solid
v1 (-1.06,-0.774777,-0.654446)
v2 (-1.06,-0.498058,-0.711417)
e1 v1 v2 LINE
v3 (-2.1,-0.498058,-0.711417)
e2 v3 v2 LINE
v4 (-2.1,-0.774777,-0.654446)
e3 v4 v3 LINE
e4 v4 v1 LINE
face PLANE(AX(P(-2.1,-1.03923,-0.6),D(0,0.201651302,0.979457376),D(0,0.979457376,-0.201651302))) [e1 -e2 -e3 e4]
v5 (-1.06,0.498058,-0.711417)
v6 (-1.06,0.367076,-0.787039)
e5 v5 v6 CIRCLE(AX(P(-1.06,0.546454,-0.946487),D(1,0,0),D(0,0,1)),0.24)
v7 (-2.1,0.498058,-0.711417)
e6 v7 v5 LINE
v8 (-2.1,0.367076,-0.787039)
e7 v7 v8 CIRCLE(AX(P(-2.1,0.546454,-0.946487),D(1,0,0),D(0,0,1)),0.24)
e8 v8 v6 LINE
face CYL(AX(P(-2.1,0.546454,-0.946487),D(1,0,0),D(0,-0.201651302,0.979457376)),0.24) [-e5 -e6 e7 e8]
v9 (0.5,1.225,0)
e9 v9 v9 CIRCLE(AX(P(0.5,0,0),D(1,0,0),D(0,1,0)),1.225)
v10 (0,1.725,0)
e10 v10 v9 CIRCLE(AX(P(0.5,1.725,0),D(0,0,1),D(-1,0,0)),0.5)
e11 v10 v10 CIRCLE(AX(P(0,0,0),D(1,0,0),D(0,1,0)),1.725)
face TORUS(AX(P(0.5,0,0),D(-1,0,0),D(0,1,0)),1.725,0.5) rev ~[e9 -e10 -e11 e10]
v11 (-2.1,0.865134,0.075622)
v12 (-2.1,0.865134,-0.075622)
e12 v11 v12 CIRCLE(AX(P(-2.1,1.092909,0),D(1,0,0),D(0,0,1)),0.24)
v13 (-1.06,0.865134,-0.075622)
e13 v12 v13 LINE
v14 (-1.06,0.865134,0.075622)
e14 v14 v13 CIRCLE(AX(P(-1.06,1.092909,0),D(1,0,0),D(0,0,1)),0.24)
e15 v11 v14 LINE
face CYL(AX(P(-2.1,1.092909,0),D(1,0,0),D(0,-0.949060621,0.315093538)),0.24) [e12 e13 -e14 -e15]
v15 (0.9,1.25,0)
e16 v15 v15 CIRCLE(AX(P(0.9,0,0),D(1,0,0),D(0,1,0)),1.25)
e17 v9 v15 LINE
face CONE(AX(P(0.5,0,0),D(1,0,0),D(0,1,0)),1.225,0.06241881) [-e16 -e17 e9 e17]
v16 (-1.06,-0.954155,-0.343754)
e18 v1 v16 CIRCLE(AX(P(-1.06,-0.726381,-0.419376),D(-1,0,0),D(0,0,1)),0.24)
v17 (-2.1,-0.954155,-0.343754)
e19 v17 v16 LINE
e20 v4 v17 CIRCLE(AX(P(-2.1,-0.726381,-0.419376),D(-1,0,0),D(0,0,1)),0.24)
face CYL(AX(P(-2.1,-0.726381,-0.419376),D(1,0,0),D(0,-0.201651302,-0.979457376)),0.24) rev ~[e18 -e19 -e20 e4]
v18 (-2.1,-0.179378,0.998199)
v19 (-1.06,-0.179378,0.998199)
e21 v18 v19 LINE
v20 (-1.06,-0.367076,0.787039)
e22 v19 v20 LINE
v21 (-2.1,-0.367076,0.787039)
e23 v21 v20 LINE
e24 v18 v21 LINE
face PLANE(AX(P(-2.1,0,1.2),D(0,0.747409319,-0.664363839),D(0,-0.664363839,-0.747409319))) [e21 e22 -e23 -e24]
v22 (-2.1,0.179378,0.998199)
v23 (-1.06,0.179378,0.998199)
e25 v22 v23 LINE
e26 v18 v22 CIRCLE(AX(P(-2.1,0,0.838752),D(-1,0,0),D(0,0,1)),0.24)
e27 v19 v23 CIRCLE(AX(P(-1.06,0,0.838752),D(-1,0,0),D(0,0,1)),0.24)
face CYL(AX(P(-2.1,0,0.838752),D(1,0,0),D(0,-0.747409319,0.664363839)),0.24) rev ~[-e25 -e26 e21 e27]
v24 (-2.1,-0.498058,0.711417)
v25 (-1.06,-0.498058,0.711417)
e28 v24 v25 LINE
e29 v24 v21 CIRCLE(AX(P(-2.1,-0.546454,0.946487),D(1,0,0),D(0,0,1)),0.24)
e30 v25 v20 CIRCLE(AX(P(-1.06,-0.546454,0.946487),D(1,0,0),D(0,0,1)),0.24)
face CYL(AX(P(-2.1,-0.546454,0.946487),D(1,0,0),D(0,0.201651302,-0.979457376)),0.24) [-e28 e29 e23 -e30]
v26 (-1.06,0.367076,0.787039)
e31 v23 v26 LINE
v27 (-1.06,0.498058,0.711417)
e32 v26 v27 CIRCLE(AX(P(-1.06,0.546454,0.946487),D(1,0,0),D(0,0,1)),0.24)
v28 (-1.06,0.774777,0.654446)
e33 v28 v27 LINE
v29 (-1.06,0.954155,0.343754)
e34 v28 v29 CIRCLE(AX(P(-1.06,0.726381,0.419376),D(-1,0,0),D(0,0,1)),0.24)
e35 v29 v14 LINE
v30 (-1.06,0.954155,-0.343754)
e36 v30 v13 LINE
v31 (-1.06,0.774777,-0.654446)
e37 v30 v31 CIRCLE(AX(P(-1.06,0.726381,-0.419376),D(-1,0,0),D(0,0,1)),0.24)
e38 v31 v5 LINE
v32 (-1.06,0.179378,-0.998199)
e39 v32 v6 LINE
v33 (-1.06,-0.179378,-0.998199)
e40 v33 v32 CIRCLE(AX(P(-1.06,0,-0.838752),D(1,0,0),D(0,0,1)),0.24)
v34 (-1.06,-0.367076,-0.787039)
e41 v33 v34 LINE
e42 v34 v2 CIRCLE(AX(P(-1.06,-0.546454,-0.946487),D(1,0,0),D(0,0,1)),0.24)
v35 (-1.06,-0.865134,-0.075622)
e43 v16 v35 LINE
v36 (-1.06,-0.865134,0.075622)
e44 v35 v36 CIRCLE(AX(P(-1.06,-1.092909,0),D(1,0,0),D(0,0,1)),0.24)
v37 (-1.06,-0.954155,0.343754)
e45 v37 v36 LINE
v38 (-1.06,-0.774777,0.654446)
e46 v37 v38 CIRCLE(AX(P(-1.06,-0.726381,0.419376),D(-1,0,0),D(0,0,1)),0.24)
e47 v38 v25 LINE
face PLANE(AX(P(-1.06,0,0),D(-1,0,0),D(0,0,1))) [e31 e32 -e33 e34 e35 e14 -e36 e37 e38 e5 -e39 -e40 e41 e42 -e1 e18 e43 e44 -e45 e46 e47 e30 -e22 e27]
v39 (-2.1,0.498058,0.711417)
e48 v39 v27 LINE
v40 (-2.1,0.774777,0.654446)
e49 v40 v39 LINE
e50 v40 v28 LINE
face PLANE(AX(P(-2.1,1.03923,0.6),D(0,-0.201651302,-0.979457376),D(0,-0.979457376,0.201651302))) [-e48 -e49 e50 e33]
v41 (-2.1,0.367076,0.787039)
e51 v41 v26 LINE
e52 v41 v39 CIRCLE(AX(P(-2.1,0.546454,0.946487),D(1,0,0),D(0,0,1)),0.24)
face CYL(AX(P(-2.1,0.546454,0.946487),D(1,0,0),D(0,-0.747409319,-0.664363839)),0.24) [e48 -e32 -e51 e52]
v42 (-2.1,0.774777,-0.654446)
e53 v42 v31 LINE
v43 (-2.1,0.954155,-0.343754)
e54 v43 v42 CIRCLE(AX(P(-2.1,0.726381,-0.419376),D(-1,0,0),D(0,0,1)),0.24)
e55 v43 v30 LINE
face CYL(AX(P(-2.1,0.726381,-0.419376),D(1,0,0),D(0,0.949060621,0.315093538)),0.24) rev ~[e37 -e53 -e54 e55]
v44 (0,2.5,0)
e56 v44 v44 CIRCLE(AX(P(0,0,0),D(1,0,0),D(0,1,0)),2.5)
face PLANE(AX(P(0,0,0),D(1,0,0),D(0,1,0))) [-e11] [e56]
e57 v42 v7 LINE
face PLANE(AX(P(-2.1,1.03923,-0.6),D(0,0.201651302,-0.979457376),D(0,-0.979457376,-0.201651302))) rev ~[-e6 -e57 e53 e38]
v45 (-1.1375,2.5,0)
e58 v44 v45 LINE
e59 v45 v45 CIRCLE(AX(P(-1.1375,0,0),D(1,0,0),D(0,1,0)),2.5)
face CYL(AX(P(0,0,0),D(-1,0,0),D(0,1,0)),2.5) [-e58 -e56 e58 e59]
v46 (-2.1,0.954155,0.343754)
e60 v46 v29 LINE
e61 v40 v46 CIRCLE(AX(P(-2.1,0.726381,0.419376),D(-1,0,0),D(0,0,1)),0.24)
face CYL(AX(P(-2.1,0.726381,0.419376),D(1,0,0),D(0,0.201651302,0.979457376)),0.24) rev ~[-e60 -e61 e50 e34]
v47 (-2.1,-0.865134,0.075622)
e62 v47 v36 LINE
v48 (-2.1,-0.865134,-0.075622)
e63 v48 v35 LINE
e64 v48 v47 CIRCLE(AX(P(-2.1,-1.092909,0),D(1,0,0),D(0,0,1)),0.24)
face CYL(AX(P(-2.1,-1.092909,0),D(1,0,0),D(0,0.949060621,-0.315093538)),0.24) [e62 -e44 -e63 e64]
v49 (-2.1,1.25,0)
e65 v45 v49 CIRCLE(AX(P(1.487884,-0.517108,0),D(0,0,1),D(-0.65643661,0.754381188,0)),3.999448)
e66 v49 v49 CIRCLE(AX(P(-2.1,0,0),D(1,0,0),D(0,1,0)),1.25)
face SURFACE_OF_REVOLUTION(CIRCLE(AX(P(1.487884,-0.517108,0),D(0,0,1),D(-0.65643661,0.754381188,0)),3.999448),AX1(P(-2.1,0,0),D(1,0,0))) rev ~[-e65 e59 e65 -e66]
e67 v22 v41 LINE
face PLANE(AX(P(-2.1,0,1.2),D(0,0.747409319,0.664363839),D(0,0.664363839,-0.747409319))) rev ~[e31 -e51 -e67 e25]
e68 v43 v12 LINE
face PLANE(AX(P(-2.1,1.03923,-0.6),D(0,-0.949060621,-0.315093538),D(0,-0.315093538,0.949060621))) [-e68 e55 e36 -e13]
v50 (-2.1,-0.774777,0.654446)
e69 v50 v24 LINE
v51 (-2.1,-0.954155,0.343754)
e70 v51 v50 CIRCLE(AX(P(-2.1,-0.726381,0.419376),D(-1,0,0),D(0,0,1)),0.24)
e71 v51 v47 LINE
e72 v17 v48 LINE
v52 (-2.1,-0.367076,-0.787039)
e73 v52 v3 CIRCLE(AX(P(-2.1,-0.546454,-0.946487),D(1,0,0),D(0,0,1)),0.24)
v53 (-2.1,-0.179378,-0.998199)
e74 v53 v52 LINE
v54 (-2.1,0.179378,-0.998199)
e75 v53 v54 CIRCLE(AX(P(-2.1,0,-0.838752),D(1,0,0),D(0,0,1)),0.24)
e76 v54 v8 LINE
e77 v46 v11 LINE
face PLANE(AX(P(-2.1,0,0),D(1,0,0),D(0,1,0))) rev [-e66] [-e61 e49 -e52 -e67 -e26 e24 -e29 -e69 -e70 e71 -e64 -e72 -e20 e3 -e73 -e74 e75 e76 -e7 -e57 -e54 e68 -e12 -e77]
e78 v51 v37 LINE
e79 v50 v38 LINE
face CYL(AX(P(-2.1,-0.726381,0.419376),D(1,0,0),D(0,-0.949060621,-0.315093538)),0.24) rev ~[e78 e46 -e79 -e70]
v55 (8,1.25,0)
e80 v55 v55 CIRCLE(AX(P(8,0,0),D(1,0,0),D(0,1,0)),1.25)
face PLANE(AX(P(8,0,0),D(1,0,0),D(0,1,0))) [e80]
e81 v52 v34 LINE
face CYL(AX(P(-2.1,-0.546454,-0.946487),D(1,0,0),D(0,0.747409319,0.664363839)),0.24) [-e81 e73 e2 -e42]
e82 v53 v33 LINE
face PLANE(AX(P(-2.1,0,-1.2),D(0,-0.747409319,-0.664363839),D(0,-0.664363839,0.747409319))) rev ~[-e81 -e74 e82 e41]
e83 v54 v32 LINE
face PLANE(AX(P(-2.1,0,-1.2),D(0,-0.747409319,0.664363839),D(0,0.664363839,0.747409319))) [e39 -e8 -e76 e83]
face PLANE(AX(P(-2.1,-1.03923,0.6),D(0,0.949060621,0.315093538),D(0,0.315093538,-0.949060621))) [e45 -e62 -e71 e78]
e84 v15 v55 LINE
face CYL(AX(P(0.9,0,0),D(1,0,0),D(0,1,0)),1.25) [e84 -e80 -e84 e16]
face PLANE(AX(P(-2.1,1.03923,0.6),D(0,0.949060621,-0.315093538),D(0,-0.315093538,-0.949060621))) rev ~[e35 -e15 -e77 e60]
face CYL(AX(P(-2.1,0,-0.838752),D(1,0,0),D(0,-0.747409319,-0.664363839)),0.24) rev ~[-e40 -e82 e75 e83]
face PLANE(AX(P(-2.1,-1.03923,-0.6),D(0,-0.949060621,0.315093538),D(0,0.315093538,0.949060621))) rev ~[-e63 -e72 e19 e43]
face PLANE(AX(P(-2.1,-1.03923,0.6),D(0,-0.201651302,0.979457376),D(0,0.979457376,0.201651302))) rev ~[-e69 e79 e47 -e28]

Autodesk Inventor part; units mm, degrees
ref_plane "YZ Plane" through (0, 0, 0) normal (1, 0, 0) x (0, 1, 0)
ref_plane "XZ Plane" through (0, 0, 0) normal (0, 1, 0) x (-1, 0, 0)
ref_plane "XY Plane" through (0, 0, 0) normal (0, 0, 1) x (1, 0, 0)
sketch "Sketch4" plane through (0, 0, 0) normal (0, 0, 1) x (1, 0, 0)
  line L0 (-2.1, 0) -> (8, 0)
  line L1 (0, 0) -> (-2.1, 0)
  line L2 (0, 2.5) -> (0, 1.725)
  line L3 (0.5, 1.225) -> (0.5, 1.225)
  line L4 (0.5, 1.225) -> (0.9, 1.25)
  arc A0 (0, 1.725) -> (0.5, 1.225) centre (0.5, 1.725) ccw
  line L5 (-2.1, 0) -> (-2.1, 1.25)
  line L6 (0, 2.5) -> (-1.1375, 2.5)
  arc A1 (-1.1375, 2.5) -> (-2.1, 1.25) centre (1.4883, -0.5175) ccw
  line L7 (0.9, 1.25) -> (8, 1.25)
  line L8 (8, 1.25) -> (8, 0)
  point P0 (0, 1.225)
  dimension "d71" = 0.5
  dimension "d72" = 8
  dimension "d74" = 0.4
  dimension "d75" = 2.45
  dimension "d78" = 2.5
  dimension "d82" = 4
  dimension "d83" = 2.1
  dimension "d84" = 5
  dimension "d104" = 7.1
  dimension "d105" = 2.5
revolve "Revolution7" add sketch "Sketch4" angle 360 about axis through (-2.1, 0, 0) along (1, 0, 0)
sketch "Sketch5" plane through (-2.1, 0, 0) normal (-1, 0, 0) x (0, 0, 1)
  circle A0 centre (0, 0) radius 1.2 construction
  circle A1 centre (0, 0) radius 0.84 construction
  line L0 (0, 0) -> (-0.7275, 0.42)
  line L1 (0, 0) -> (-0.7275, -0.42)
  line L2 (-1.8008, 0) -> (1.7887, 0)
  line L3 (-1.2, 0) -> (-0.7275, -0.42)
  line L4 (-1.2, 0) -> (-0.7275, 0.42)
  dimension "d88" = 2.4
  dimension "d89" = 1.68
  dimension "d90" = 30
  dimension "d91" = 30
extrude "Extrusion1" cut sketch "Sketch5" against normal blind 1.04
pattern_circular "Circular Pattern1" count 6 over 360 about axis through (-10, 0, 0) along (1, 0, 0) of "Extrusion1"
fillet "Fillet1" radius 0.24 12 edges at (-1.58, -1.0392, -0.6) (-1.58, -0.42, -0.7275) (-1.58, -0.84, 0) (-1.58, -1.0392, 0.6) (-1.58, -0.42, 0.7275) (-1.58, 0, 1.2) (-1.58, 0.84, 0) (-1.58, 1.0392, 0.6) (-1.58, 0.42, 0.7275) (-1.58, 0.42, -0.7275) (-1.58, 0, -1.2) (-1.58, 1.0392, -0.6)
thread "Thread7" size "M2.5x0.45" class "6g" standard "ISO Metric profile" length 7.1
equation "\"a\" = 0.9"
equation "\"b\" = 7.1"
equation "\"dk\" = 5"
equation "\"k\" = 2.1"
equation "\"r\" = 0.5"
equation "\"rf\" = 4"
equation "\"x\" = 0.4"
equation "\"A_\" = 2.4"
equation "\"t\" = 1.04"
equation "\"p\" = 0.45"
equation "\"l_\" = 8"
equation "\"d\" = 2.5"
equation "\"ds_\" = 2.45"
equation "\"lg\" = 0"
properties part number "Flachkopfschraube mit Innenrund ISO 14583 - M2,5 x 8 - 4.8" material "Stahl"
